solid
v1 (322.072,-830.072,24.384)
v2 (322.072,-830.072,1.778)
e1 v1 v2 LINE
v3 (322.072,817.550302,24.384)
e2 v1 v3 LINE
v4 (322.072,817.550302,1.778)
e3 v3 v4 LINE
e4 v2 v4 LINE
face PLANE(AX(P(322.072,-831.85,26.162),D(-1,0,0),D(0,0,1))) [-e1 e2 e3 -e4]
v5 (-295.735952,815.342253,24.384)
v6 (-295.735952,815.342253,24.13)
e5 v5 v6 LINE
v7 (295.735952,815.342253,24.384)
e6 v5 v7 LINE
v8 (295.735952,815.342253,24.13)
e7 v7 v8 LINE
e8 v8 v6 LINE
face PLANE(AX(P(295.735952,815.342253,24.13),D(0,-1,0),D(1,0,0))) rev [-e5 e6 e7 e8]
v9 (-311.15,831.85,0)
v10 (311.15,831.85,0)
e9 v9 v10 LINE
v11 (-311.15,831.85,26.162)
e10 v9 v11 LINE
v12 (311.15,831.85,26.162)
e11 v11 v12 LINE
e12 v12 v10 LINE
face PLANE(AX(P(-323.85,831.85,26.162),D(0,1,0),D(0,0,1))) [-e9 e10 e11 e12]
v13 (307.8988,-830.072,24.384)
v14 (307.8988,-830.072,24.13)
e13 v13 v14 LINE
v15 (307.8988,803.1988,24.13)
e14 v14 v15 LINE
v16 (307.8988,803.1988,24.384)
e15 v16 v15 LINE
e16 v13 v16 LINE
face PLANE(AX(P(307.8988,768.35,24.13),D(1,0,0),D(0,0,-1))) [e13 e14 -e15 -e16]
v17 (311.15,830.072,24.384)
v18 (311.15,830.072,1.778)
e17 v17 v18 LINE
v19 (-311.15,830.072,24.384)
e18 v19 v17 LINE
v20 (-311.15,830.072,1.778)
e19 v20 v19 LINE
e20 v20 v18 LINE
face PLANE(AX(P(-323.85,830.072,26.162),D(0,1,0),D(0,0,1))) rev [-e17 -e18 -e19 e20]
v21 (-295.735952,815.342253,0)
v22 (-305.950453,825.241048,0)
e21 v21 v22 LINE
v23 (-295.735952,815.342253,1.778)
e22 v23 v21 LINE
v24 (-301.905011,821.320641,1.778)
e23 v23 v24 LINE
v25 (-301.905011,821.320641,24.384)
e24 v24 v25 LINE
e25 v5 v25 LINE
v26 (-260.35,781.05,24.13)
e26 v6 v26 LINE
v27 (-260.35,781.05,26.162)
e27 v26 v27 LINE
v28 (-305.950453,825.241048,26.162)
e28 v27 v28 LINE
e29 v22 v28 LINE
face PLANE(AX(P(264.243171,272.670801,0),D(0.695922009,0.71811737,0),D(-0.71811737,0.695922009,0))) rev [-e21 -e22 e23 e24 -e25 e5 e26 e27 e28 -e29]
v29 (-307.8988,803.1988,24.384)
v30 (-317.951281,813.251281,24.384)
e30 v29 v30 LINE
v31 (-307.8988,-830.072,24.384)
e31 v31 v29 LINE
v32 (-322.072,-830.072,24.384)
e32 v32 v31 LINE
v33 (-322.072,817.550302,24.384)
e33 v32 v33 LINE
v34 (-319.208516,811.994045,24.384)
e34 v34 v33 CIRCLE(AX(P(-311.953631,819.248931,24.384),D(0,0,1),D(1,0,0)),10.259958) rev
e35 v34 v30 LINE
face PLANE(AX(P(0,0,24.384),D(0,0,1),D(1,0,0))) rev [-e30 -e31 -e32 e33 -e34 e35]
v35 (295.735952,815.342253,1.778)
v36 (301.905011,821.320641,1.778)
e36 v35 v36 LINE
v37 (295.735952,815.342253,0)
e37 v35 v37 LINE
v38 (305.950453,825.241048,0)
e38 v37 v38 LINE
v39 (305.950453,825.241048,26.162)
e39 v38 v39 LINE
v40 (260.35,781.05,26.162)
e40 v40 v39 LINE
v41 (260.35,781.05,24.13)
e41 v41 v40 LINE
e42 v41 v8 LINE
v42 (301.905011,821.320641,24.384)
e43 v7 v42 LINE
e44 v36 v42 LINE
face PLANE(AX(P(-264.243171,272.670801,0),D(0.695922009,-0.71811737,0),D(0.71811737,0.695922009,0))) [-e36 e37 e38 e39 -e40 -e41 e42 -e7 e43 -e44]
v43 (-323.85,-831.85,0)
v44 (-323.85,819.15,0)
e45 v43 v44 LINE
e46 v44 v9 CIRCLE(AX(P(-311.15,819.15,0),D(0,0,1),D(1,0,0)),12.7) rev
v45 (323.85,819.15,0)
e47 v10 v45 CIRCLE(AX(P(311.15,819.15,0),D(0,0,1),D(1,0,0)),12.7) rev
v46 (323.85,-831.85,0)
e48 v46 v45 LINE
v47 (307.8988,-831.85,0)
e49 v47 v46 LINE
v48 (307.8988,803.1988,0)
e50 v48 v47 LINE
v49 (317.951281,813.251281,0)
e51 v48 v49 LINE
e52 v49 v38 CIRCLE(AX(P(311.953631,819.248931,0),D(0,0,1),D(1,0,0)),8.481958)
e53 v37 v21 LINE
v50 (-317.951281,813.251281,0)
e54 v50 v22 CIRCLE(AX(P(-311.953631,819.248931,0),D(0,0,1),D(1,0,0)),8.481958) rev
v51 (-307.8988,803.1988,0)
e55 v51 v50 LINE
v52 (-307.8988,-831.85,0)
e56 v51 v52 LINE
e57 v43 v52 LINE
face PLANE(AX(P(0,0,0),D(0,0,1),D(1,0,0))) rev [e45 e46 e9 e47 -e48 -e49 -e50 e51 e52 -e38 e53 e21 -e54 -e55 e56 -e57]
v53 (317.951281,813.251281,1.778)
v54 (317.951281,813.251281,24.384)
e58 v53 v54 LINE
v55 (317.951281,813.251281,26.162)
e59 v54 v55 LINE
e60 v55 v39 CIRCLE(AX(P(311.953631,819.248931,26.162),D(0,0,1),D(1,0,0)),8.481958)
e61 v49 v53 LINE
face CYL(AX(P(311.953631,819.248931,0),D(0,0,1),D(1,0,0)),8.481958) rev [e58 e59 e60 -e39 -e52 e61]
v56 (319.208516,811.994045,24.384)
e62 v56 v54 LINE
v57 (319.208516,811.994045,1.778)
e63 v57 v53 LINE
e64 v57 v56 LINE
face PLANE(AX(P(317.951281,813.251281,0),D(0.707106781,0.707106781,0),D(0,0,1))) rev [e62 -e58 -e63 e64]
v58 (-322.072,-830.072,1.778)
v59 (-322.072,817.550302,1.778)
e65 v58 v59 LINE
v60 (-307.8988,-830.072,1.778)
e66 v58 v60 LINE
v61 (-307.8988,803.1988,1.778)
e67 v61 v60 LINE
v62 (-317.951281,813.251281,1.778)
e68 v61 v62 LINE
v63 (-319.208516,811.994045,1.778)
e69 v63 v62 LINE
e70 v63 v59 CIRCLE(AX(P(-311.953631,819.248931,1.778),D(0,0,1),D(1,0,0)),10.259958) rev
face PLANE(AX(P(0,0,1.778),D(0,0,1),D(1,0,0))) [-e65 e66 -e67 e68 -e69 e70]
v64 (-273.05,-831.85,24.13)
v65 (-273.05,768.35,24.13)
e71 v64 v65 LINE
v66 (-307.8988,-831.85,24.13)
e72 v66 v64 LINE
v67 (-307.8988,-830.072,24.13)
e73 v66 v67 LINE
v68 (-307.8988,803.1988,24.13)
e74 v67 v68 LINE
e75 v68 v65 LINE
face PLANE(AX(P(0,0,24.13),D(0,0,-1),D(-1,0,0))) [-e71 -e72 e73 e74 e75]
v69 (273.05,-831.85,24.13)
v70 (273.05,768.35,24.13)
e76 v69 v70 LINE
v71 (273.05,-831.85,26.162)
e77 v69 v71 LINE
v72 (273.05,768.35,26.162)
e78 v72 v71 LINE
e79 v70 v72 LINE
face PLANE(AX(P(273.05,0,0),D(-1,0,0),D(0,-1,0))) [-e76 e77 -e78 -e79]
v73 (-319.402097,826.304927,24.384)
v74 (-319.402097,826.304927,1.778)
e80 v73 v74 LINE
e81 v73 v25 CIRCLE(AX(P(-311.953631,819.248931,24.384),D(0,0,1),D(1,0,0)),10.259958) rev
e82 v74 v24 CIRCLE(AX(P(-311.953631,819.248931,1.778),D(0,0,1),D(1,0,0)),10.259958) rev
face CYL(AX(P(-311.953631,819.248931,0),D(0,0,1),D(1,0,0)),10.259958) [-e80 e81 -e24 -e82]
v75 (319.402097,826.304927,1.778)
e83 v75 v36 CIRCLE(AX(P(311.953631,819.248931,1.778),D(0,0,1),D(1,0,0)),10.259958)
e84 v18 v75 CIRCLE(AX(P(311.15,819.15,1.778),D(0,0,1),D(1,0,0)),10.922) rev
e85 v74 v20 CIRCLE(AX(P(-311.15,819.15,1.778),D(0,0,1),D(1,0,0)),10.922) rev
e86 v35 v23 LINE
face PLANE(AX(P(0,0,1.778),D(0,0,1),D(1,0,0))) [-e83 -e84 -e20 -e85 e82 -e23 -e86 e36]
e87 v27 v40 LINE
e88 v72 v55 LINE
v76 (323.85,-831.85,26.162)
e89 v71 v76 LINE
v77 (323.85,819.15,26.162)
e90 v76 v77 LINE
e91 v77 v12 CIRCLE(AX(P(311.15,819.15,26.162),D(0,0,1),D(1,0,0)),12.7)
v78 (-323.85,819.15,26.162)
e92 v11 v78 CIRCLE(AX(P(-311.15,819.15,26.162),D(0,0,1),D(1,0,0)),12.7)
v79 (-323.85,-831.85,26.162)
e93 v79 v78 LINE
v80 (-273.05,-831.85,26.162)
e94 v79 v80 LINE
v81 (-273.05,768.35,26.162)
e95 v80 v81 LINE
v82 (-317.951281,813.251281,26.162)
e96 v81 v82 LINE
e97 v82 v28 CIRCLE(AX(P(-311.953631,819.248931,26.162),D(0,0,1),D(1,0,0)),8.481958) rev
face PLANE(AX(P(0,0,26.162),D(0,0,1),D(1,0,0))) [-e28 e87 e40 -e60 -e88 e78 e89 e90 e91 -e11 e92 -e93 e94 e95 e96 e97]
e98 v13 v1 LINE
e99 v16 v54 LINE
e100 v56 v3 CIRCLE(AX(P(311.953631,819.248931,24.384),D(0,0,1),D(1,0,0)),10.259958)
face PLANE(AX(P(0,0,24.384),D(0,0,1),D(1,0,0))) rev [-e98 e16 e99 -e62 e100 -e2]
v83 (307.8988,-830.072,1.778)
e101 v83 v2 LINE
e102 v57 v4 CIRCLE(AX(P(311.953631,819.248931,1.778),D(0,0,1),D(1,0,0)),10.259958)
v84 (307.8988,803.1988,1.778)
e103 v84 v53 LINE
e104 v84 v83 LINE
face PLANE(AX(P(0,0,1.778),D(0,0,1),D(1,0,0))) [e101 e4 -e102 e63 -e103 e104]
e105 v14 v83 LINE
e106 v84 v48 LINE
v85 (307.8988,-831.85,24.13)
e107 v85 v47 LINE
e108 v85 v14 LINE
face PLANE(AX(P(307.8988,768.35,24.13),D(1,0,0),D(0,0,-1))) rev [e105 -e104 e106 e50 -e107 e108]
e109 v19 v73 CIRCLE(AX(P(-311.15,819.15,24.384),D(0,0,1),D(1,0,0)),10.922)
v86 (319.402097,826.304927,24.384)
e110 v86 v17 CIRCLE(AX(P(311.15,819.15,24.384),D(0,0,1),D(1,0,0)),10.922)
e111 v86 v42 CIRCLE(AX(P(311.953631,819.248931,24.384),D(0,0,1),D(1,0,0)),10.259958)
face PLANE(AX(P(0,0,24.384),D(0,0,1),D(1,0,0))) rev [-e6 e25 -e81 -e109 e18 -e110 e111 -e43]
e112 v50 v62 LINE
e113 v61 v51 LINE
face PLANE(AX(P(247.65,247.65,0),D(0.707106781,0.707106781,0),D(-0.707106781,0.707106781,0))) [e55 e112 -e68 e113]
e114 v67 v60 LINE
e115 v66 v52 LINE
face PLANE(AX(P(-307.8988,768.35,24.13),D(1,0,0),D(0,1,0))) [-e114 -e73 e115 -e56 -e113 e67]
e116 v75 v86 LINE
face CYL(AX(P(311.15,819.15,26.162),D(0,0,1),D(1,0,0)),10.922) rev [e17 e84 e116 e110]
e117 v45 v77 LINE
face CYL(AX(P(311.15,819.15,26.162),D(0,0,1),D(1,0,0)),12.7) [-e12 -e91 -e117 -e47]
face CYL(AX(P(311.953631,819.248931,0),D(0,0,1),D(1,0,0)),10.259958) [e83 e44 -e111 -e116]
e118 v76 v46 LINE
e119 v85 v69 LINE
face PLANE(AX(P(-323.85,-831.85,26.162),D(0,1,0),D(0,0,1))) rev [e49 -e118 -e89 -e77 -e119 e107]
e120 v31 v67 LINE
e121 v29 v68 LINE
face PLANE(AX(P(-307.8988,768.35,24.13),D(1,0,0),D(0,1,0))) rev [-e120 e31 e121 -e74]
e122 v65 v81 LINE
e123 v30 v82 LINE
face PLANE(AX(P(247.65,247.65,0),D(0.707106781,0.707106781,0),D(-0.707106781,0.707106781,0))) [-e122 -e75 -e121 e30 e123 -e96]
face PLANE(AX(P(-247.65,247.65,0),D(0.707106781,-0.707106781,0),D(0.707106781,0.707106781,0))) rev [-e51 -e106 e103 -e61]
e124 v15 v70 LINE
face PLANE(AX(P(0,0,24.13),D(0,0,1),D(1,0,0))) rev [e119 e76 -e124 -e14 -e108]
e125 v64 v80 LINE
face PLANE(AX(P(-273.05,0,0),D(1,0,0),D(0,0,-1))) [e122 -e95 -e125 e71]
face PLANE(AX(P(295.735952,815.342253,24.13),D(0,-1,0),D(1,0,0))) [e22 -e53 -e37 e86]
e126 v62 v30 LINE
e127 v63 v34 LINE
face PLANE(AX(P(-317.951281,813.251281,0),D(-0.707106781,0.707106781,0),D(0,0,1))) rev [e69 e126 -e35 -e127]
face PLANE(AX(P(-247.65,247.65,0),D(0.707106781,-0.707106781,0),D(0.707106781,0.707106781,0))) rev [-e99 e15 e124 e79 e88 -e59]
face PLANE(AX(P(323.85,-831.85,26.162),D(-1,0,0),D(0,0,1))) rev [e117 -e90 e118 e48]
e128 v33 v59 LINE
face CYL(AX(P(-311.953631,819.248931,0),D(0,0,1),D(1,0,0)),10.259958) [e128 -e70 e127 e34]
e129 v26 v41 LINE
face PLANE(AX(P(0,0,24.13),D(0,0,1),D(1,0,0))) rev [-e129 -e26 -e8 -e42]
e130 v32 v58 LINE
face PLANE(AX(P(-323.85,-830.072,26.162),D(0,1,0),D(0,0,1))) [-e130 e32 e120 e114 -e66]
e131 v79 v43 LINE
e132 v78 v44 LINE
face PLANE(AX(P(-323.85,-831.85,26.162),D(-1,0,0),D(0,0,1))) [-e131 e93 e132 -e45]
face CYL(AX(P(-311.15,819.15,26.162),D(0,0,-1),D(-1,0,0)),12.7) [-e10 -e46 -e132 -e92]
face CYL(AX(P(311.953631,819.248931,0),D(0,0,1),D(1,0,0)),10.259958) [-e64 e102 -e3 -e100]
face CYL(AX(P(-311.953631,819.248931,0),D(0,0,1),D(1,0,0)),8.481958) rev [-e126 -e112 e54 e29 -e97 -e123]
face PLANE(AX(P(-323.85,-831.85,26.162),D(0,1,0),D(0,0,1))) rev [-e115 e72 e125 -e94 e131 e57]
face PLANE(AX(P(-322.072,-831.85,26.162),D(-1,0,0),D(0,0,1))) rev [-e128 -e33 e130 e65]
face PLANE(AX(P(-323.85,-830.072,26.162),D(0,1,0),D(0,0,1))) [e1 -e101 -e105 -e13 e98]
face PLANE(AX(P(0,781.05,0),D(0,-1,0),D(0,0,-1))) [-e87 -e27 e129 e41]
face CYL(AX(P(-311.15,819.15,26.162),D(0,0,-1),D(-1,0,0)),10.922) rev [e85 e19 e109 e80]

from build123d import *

# Parameters (mm, degrees)
SKETCH1_W           = 647.7
SKETCH1_H           = 1663.7
BOSS_EXTRUDE1_DEPTH = 26.162
SKETCH2_W           = 546.1
SKETCH2_H           = 1612.9
CUT_EXTRUDE1_DEPTH  = 26.162
CUT_EXTRUDE2_DEPTH  = 26.162
CUT_EXTRUDE3_DEPTH  = 24.13
FILLET1_R           = 12.7
SHELL4_START        = 1.778
SHELL4_DEPTH        = 22.606


# Read off the part's stored shape, not the designer's step: Shell4
with BuildPart() as part:
    # Sketch1 → Boss-Extrude1 (new body)
    with BuildSketch(Plane.XY):
        Rectangle(SKETCH1_W, SKETCH1_H)
    extrude(amount=BOSS_EXTRUDE1_DEPTH)

    # Sketch2 → Cut-Extrude1 (cut)
    with BuildSketch(Plane.XY.offset(26.162)):
        with Locations((0, -25.4)):
            Rectangle(SKETCH2_W, SKETCH2_H)
    extrude(amount=-CUT_EXTRUDE1_DEPTH, mode=Mode.SUBTRACT)

    # Sketch3 → Cut-Extrude2 (cut)
    with BuildSketch(Plane.XY.offset(26.162)):
        with BuildLine():
            Line((-317.951280605, 813.251280605), (-273.05, 768.35))
            Line((-273.05, 768.35), (-273.05, 781.05))
            Line((-273.05, 781.05), (-260.35, 781.05))
            Line((-260.35, 781.05), (-305.950453026, 825.241047594))
            ThreePointArc((-305.950453026, 825.241047594), (-317.94851482, 825.249344949), (-317.951280605, 813.251280605))
        make_face()
        with BuildLine():
            Line((305.950453026, 825.241047594), (260.35, 781.05))
            Line((260.35, 781.05), (273.05, 781.05))
            Line((273.05, 781.05), (273.05, 768.35))
            Line((273.05, 768.35), (317.951280605, 813.251280605))
            ThreePointArc((317.951280605, 813.251280605), (317.94851482, 825.249344949), (305.950453026, 825.241047594))
        make_face()
    extrude(amount=-CUT_EXTRUDE2_DEPTH, mode=Mode.SUBTRACT)

    # Sketch4 → Cut-Extrude3 (cut)
    with BuildSketch(Plane(origin=(0, 0, 0), x_dir=(-1, 0, 0), z_dir=(0, 0, -1))):
        Polygon((-307.8988, 768.35), (-307.8988, 803.1988), (-273.05, 768.35), (-273.05, -831.85), (-307.8988, -831.85), align=None)
        Polygon((-260.35, 781.05), (-295.735951532, 815.342252918), (295.735951532, 815.342252918), (260.35, 781.05), align=None)
        Polygon((307.8988, 803.1988), (273.05, 768.35), (273.05, -831.85), (307.8988, -831.85), (307.8988, 768.35), align=None)
    extrude(amount=-CUT_EXTRUDE3_DEPTH, mode=Mode.SUBTRACT)

    # Fillet1
    fillet1_edges = [part.edges().sort_by_distance(p)[0] for p in [
        (-323.85, 831.85, 13.081),
        (323.85, 831.85, 13.081),
    ]]
    fillet(fillet1_edges, radius=FILLET1_R)

    # Shell4 outline → Shell4 (cut)
    with BuildSketch(Plane.XY.offset(SHELL4_START)):
        with BuildLine():
            Line((307.8988, 803.1988), (307.8988, -830.072))
            Line((307.8988, -830.072), (322.072, -830.072))
            Line((322.072, -830.072), (322.072, 817.550302353))
            ThreePointArc((322.072, 817.550302353), (321.07369087, 814.548798877), (319.208516462, 811.994044748))
            Line((319.208516462, 811.994044748), (317.951280605, 813.251280605))
            Line((317.951280605, 813.251280605), (307.8988, 803.1988))
        make_face()
        with BuildLine():
            Line((-322.072, -830.072), (-307.8988, -830.072))
            Line((-307.8988, -830.072), (-307.8988, 803.1988))
            Line((-307.8988, 803.1988), (-317.951280605, 813.251280605))
            Line((-317.951280605, 813.251280605), (-319.208516462, 811.994044748))
            ThreePointArc((-319.208516462, 811.994044748), (-321.07369087, 814.548798877), (-322.072, 817.550302353))
            Line((-322.072, 817.550302353), (-322.072, -830.072))
        make_face()
        with BuildLine():
            ThreePointArc((301.905011396, 821.320641288), (309.142763578, 829.116339567), (319.402097182, 826.304926702))
            ThreePointArc((319.402097182, 826.304926702), (315.685635268, 829.085698099), (311.15, 830.072))
            Line((311.15, 830.072), (-311.15, 830.072))
            ThreePointArc((-311.15, 830.072), (-315.685635267, 829.085698099), (-319.402097181, 826.304926702))
            ThreePointArc((-319.402097181, 826.304926702), (-309.142763577, 829.116339567), (-301.905011396, 821.320641288))
            Line((-301.905011396, 821.320641288), (-295.735951532, 815.342252918))
            Line((-295.735951532, 815.342252918), (295.735951532, 815.342252918))
            Line((295.735951532, 815.342252918), (301.905011396, 821.320641288))
        make_face()
    extrude(amount=SHELL4_DEPTH, mode=Mode.SUBTRACT)


solid = part.part
